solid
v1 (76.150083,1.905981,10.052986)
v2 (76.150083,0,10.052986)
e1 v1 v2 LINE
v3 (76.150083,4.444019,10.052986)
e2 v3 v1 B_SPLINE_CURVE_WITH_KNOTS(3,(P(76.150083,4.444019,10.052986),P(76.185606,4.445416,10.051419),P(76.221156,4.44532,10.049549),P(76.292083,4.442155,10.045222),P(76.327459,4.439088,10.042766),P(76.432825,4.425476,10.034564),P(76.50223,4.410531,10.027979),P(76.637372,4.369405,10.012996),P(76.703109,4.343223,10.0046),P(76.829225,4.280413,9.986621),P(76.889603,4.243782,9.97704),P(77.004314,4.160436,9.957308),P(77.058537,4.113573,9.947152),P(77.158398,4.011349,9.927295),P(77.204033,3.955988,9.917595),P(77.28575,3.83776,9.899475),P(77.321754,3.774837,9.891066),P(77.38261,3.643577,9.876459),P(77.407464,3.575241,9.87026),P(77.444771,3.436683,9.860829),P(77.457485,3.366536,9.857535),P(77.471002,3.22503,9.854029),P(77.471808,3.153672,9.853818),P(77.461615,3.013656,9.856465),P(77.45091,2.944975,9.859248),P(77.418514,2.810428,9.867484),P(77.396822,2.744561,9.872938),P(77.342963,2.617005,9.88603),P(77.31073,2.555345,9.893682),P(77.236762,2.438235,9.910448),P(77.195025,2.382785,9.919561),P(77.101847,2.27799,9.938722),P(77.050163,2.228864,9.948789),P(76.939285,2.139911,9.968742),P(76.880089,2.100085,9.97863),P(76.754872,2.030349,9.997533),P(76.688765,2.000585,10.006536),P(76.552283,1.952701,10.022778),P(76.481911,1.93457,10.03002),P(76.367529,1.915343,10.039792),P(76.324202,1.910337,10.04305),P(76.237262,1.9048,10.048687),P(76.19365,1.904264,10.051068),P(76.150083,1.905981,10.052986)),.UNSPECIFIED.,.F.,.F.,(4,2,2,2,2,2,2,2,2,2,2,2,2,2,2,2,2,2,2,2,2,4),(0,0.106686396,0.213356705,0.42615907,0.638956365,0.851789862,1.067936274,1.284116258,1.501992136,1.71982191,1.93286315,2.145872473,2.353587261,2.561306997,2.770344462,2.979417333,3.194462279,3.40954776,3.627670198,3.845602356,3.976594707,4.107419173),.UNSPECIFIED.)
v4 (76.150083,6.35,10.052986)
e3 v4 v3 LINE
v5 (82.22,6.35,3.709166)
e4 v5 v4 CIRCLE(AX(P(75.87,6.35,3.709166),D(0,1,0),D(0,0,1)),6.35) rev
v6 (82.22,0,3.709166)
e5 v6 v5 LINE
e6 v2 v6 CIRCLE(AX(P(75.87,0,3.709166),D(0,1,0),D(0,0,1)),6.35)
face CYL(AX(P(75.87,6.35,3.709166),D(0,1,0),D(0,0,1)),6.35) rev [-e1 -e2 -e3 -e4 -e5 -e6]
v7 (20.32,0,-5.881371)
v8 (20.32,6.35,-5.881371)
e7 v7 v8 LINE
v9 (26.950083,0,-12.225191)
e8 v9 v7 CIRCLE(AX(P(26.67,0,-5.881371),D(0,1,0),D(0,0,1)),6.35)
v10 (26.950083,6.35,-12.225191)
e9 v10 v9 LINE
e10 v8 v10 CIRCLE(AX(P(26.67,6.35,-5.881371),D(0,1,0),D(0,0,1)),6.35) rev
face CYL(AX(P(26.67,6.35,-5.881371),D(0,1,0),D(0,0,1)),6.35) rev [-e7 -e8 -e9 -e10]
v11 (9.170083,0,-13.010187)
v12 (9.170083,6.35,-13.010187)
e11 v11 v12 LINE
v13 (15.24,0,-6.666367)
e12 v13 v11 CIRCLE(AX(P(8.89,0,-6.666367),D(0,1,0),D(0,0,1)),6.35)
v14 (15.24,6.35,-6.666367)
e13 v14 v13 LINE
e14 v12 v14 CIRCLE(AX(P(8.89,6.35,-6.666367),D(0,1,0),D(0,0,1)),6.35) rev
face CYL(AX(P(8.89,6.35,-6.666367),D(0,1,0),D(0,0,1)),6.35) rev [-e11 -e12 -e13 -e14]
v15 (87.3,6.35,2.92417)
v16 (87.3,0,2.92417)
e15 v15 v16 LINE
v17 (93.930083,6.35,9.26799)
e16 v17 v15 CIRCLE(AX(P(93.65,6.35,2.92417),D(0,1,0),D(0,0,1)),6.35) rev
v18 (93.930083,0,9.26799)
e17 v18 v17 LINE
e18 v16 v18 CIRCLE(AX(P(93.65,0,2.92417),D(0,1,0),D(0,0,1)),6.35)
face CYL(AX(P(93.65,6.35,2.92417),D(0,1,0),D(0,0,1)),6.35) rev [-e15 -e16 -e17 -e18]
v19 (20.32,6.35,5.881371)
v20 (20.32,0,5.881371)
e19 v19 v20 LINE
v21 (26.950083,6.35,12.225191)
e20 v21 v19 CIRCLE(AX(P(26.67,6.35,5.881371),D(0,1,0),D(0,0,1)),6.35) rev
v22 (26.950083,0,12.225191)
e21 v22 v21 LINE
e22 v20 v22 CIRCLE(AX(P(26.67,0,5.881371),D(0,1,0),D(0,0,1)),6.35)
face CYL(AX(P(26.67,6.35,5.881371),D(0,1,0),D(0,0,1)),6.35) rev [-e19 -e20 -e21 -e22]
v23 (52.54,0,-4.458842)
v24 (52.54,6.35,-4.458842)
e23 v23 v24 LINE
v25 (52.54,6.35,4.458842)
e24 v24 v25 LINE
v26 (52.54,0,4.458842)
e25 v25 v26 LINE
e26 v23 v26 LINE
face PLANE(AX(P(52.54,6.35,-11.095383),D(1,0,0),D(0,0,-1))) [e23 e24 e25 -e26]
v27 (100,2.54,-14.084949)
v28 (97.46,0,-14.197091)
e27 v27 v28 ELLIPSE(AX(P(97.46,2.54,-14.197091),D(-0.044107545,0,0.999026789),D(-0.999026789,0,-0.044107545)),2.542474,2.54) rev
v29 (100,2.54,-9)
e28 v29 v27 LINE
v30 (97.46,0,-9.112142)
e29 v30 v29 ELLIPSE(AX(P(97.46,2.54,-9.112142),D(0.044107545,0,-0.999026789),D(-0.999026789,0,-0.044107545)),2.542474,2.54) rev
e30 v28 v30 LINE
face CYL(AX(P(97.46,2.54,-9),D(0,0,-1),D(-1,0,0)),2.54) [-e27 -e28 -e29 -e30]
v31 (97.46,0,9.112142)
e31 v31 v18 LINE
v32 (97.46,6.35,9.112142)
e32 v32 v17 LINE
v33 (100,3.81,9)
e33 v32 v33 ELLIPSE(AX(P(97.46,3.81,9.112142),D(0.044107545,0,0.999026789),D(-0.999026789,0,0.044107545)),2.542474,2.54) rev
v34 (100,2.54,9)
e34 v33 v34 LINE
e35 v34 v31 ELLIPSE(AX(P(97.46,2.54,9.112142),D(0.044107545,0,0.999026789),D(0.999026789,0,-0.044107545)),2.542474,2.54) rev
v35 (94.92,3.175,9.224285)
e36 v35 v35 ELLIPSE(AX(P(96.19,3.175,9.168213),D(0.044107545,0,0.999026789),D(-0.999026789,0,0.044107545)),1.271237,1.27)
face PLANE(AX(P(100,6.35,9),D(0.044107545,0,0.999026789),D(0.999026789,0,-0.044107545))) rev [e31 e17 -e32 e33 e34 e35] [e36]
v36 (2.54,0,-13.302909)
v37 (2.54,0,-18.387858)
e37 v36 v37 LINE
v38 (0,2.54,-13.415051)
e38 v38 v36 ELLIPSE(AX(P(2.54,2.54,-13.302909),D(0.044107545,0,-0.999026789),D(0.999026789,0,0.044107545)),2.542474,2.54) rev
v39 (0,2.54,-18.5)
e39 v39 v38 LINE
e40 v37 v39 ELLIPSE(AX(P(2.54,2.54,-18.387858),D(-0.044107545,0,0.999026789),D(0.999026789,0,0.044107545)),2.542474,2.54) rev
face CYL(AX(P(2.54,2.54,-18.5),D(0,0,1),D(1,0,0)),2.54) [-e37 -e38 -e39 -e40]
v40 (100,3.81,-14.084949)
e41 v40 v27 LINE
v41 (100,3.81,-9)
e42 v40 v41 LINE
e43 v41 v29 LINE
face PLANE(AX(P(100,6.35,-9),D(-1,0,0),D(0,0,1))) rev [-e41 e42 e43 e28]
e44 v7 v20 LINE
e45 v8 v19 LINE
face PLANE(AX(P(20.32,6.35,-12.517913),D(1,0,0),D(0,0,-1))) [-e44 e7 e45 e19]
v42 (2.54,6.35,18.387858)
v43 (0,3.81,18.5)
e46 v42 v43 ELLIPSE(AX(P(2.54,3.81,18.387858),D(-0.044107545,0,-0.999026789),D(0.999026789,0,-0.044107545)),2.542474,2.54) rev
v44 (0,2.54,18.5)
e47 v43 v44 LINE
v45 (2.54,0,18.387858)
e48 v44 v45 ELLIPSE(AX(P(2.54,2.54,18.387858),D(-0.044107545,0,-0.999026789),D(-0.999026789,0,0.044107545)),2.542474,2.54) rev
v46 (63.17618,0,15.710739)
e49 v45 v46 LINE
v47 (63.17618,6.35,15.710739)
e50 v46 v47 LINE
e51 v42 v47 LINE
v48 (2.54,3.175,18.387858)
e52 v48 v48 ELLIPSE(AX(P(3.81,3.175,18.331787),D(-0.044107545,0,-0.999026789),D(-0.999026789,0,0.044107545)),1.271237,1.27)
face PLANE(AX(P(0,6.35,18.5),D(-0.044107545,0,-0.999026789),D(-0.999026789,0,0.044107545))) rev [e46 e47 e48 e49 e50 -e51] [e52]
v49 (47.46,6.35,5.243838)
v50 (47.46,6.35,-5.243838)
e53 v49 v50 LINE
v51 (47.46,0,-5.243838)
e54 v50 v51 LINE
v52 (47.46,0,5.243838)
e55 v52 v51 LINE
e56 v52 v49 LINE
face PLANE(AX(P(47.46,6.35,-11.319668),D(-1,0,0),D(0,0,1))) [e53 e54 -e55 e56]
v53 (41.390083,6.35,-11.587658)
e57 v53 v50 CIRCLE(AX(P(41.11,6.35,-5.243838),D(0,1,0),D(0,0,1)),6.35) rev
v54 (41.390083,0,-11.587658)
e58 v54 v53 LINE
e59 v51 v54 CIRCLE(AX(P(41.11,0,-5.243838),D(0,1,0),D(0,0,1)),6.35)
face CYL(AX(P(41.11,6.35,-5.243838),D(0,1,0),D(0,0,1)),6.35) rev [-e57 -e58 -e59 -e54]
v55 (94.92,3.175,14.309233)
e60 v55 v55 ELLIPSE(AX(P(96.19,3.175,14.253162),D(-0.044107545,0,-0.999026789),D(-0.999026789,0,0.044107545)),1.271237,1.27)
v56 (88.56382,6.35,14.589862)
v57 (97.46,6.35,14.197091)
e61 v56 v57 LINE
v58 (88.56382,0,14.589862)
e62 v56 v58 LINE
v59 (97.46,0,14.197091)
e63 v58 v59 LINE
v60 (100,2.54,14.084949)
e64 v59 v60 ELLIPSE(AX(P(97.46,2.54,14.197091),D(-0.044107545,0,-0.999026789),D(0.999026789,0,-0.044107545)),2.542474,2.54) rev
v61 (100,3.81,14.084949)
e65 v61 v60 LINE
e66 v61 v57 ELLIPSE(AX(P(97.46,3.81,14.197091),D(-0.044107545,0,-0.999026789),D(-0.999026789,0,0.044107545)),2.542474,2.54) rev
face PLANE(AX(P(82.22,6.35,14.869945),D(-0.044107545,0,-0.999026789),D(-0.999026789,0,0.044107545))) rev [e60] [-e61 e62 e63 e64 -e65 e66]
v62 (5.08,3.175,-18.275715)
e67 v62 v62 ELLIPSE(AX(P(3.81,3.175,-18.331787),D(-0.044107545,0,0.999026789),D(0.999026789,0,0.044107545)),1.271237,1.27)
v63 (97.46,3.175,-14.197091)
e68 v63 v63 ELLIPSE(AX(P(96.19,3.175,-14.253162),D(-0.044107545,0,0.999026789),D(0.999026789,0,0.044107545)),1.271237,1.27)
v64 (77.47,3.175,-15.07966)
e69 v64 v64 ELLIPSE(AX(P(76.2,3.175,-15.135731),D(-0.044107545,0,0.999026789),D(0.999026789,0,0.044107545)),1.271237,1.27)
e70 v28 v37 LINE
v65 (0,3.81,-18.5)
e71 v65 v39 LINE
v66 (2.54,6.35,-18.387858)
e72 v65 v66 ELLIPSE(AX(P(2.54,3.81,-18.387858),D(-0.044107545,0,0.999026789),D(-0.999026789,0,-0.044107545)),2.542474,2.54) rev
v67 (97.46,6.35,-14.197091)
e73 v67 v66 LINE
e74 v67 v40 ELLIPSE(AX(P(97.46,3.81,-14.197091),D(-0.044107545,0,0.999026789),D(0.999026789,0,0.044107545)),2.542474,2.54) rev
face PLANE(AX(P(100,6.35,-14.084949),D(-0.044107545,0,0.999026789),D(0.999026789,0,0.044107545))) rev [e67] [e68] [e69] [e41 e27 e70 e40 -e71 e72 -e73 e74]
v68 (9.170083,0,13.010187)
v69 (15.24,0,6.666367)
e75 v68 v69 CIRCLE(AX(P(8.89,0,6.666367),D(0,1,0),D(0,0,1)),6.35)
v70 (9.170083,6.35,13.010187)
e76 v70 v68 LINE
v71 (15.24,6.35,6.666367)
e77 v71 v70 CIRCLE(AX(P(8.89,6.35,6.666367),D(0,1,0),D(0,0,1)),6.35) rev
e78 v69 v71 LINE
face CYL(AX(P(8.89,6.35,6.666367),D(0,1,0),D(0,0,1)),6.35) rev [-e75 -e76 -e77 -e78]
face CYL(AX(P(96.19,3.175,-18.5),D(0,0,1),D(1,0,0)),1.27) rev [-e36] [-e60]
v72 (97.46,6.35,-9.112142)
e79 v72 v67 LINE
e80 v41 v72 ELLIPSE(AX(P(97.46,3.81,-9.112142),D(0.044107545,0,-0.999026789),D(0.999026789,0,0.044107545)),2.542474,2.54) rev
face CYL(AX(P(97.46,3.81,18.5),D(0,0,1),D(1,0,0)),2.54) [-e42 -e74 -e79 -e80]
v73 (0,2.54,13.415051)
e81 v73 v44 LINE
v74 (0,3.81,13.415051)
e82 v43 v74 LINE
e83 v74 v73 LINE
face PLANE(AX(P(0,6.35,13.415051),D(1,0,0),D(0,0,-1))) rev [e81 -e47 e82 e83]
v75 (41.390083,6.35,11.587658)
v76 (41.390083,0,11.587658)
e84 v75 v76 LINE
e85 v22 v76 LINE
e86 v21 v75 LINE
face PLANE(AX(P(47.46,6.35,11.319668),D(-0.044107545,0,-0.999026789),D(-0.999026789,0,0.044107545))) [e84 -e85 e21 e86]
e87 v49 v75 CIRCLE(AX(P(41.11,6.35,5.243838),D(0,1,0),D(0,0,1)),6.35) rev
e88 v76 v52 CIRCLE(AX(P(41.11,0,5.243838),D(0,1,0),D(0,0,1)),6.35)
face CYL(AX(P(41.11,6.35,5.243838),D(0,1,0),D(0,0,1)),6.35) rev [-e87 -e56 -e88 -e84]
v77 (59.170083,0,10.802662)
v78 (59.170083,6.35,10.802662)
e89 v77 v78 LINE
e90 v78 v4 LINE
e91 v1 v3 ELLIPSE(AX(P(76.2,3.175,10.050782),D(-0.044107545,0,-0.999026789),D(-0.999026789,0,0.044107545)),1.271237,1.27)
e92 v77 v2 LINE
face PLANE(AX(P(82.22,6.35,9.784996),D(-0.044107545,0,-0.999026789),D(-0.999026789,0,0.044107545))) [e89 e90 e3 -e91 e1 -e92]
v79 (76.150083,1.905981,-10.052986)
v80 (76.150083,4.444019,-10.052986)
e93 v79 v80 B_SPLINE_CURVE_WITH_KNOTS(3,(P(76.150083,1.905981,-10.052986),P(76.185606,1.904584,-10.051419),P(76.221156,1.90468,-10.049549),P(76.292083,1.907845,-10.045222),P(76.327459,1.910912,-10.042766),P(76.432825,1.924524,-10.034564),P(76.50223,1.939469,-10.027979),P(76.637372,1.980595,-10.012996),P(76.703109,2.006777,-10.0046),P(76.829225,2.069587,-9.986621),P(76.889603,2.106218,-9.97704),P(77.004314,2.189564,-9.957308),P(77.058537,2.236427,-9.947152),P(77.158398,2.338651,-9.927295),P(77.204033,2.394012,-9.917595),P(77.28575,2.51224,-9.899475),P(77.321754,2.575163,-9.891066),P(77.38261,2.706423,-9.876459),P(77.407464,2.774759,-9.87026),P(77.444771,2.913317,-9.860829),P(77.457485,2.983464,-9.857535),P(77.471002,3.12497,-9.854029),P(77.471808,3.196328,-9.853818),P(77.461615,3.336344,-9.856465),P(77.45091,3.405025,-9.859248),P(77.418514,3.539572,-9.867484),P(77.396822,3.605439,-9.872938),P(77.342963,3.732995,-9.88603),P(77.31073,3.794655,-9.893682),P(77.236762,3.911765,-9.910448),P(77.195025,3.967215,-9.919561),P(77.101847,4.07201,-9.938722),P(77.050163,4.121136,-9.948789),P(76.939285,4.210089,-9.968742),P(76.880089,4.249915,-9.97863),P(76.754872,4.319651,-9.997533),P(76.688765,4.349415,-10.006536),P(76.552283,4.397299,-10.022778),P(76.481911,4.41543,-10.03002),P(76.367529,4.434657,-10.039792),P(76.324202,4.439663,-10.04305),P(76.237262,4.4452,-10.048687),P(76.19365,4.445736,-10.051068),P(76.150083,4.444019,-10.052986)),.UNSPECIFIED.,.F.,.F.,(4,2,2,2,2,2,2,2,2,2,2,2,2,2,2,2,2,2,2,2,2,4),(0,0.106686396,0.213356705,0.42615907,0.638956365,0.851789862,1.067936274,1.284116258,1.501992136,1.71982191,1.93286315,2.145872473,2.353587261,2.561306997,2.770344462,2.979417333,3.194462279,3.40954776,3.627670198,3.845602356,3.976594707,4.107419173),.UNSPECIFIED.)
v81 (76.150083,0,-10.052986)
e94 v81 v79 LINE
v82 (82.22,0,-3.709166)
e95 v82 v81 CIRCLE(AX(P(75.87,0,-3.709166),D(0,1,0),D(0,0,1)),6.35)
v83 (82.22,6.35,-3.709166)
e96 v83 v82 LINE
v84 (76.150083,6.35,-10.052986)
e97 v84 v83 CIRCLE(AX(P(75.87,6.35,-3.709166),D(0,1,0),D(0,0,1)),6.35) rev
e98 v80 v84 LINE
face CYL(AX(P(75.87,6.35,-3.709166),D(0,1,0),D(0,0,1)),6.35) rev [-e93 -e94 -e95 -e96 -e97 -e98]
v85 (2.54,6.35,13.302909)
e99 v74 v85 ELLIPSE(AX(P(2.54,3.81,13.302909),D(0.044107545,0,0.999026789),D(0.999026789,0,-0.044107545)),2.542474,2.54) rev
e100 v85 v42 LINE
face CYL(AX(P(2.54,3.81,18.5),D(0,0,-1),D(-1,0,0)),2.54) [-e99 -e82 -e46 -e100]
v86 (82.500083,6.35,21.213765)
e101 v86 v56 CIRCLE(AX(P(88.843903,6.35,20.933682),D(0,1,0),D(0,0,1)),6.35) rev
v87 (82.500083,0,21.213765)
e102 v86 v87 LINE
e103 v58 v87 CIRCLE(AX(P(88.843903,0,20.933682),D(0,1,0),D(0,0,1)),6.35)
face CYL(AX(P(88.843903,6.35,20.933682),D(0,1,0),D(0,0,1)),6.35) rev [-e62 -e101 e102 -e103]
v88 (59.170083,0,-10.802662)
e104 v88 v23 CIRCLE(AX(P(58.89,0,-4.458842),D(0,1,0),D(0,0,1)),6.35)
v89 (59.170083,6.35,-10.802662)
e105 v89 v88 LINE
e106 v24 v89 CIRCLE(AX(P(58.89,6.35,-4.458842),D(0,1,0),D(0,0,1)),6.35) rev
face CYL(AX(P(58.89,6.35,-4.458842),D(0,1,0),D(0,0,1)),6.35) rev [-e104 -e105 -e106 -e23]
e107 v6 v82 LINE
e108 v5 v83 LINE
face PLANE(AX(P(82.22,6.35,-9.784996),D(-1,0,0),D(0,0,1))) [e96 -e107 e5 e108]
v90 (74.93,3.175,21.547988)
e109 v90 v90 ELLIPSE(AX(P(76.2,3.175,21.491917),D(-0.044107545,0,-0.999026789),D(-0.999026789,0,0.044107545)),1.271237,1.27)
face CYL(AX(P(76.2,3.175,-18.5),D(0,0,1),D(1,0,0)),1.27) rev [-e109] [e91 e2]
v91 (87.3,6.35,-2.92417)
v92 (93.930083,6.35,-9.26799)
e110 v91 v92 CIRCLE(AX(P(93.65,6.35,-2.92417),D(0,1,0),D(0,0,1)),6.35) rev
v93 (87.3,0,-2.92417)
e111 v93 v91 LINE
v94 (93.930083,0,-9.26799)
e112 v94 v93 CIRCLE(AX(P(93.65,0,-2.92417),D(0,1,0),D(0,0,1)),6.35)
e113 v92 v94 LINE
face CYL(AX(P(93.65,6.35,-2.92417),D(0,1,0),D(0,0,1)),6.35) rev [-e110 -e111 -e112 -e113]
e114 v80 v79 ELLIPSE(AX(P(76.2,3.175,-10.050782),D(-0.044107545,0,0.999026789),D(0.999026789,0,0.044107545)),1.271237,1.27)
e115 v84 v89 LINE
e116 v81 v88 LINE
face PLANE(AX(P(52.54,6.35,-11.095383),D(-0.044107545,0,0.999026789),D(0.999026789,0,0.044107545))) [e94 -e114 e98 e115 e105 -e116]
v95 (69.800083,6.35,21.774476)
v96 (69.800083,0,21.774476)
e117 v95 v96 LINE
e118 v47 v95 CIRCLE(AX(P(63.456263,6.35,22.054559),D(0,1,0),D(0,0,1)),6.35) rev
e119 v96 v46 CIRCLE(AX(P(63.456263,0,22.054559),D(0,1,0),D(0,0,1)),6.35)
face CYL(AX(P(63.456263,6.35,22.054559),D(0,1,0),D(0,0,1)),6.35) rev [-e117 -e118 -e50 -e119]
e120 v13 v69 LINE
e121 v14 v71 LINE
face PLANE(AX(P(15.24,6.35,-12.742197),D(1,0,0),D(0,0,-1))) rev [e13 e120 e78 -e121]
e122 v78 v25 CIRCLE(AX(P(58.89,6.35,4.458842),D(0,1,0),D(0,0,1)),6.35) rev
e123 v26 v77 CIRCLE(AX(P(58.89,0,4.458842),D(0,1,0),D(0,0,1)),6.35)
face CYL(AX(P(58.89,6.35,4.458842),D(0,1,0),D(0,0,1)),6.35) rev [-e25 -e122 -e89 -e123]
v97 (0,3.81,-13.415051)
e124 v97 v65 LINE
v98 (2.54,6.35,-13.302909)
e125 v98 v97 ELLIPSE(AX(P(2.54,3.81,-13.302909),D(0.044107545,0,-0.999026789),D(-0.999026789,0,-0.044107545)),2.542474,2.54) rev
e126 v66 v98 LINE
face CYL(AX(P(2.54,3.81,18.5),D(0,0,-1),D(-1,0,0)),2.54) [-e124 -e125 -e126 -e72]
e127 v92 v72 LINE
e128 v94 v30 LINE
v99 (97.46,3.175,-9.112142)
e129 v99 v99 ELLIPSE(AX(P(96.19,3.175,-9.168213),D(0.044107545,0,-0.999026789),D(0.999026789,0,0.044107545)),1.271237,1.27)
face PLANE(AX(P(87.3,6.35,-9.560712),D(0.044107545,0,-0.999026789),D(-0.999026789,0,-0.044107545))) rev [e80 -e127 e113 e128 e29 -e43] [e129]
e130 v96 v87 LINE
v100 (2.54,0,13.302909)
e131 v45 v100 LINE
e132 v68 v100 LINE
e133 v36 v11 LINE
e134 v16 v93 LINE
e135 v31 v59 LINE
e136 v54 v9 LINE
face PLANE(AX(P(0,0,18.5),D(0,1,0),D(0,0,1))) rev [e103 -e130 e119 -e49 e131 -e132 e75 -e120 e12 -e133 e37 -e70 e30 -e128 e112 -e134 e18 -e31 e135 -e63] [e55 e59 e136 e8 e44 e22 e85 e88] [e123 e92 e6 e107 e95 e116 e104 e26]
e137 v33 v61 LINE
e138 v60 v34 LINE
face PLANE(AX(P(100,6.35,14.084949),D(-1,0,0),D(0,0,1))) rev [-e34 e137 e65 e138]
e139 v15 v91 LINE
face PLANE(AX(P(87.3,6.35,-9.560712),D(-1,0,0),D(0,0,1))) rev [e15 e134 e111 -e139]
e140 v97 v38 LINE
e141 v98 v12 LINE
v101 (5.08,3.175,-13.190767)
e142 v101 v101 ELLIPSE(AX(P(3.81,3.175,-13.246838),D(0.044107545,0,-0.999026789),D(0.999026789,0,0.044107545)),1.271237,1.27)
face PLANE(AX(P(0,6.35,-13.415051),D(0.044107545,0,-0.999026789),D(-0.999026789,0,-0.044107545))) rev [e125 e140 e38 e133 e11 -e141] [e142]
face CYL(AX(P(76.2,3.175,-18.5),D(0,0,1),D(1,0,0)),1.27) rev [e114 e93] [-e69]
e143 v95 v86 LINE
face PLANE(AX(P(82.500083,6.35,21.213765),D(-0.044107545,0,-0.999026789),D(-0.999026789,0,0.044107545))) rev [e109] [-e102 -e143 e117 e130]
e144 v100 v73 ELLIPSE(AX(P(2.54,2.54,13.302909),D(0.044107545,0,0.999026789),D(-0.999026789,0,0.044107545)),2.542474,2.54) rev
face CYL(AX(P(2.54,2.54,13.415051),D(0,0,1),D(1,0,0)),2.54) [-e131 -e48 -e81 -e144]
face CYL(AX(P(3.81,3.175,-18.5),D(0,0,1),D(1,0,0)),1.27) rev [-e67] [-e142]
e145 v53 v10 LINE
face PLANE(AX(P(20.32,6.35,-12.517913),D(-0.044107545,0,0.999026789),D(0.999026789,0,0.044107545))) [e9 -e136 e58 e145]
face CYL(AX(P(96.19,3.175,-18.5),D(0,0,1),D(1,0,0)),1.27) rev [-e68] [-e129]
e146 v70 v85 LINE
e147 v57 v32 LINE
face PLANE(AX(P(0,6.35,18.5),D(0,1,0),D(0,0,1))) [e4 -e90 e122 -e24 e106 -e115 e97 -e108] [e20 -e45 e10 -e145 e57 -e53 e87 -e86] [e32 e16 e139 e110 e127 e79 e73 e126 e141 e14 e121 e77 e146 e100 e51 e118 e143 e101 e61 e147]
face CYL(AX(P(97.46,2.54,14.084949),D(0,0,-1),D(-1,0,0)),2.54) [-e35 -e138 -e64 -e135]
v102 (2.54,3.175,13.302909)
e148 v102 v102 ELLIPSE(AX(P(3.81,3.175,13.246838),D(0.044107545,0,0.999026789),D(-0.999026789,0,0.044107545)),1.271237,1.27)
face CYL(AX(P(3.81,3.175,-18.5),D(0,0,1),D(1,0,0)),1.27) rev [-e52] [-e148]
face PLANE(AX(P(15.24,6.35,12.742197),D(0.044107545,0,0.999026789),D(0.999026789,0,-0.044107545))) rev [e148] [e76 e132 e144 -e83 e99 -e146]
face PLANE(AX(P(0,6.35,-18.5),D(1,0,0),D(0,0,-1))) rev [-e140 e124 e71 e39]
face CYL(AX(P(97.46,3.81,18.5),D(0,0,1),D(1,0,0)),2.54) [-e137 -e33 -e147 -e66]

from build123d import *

# Parameters (mm, degrees)
ARM_DEPTH               = 6.35
CUT_EXTRUDE1_DEPTH      = 103.539993784
CUT_EXTRUDE1_DEPTH_BACK = 103.539993784
SKETCH2_R               = 1.27
CUT_EXTRUDE2_DEPTH      = 103.539993784
CUT_EXTRUDE2_DEPTH_BACK = 103.539993784
SKETCH3_R               = 1.27
FILLET1_R               = 2.54
FILLET2_R               = 6.35
FILLET3_R               = 6.35


# Some blends are built 0.0001 mm under size
with BuildPart() as part:
    # Sketch1 → Arm (new body)
    with BuildSketch(Plane(origin=(0, 0, 0), x_dir=(1, 0, 0), z_dir=(0, 1, 0))):
        Polygon((0, -18.5), (69.52, -15.430656357), (69.80008291, -21.774476465), (82.50008291, -21.213764954), (82.22, -14.869944846), (100, -14.08494873), (100, -9), (87.3, -9.560711511), (87.3, 9.560711511), (100, 9), (100, 14.08494873), (0, 18.5), (0, 13.41505127), (15.24, 12.742197457), (15.24, -12.742197457), (0, -13.41505127), align=None)
        Polygon((82.22, -9.784996116), (52.54, -11.095383333), (52.54, 11.095383333), (82.22, 9.784996116), align=None, mode=Mode.SUBTRACT)
        Polygon((20.32, 12.517912852), (20.32, -12.517912852), (47.46, -11.319667937), (47.46, 11.319667937), align=None, mode=Mode.SUBTRACT)
    extrude(amount=ARM_DEPTH)

    # Sketch2 → Cut-Extrude1 (cut, two sides: drawn at the far end of the back side and taken through both)
    with BuildSketch(Plane.XY.offset(-CUT_EXTRUDE1_DEPTH_BACK)):
        with Locations(Location((76.2, 3.175, 0), (0, 0, 180))):
            Circle(SKETCH2_R)
    extrude(amount=CUT_EXTRUDE1_DEPTH + CUT_EXTRUDE1_DEPTH_BACK, mode=Mode.SUBTRACT)

    # Sketch3 → Cut-Extrude2 (cut, two sides: drawn at the far end of the back side and taken through both)
    with BuildSketch(Plane.XY.offset(-CUT_EXTRUDE2_DEPTH_BACK)):
        with Locations((96.19, 3.175)):
            Circle(SKETCH3_R)
        with Locations(Location((3.81, 3.175, 0), (0, 0, 180))):
            Circle(SKETCH3_R)
    extrude(amount=CUT_EXTRUDE2_DEPTH + CUT_EXTRUDE2_DEPTH_BACK, mode=Mode.SUBTRACT)

    # Fillet1
    fillet1_edges = [part.edges().sort_by_distance(p)[0] for p in [
        (0, 0, -15.957525635),
        (100, 0, -11.542474365),
        (100, 0, 11.542474365),
        (0, 0, 15.957525635),
        (100, 6.35, 11.542474365),
        (100, 6.35, -11.542474365),
        (0, 6.35, 15.957525635),
        (0, 6.35, -15.957525635),
    ]]
    fillet(fillet1_edges, radius=FILLET1_R)

    # Fillet2
    # the kernel refuses this fillet: 6.35 mm, written as the material it adds along each edge
    with BuildSketch(Plane(origin=(15.24, 0, 12.742197457), x_dir=(-0.999026788670257, 0, 0.04410754492367402), z_dir=(0, 1, 0)), Plane(origin=(15.24, 0, -12.742197457), x_dir=(0, 0, 1), z_dir=(0, 1, 0))) as fillet2_piece_1:
        with BuildLine():
            CenterArc((FILLET2_R * 0.95682364669, -FILLET2_R), FILLET2_R, 90, 87.472003686)
            Line((-FILLET2_R * 0.0422031419804, -FILLET2_R * 0.955892455076), (0, 0))
            Line((0, 0), (FILLET2_R * 0.95682364669, 0))
        make_face()
    extrude(amount=6.35)
    with BuildSketch(Plane(origin=(87.3, 0, 9.560711511), x_dir=(0.9990267886702568, 0, -0.04410754492367471), z_dir=(0, 1, 0)), Plane(origin=(52.54, 0, 11.095383333), x_dir=(0.9990267886702568, 0, -0.044107544923674566), z_dir=(0, 1, 0)), Plane(origin=(20.32, 0, 12.517912852), x_dir=(0.9990267886702568, 0, -0.044107544923674614), z_dir=(0, 1, 0)), Plane(origin=(87.3, 0, -9.560711511), x_dir=(0, 0, 1), z_dir=(0, 1, 0)), Plane(origin=(52.54, 0, -11.095383333), x_dir=(0, 0, 1), z_dir=(0, 1, 0))) as fillet2_piece_2:
        with BuildLine():
            CenterArc((FILLET2_R * 1.0451246721, FILLET2_R), FILLET2_R, 177.472003686, 92.527996314)
            Line((FILLET2_R * 0.0460978834253, FILLET2_R * 1.04410754492), (0, 0))
            Line((0, 0), (FILLET2_R * 1.0451246721, 0))
        make_face()
    extrude(amount=6.35)
    with BuildSketch(Plane(origin=(47.46, 0, 11.319667937), x_dir=(0, 0, -1), z_dir=(0, 1, 0)), Plane(origin=(47.46, 0, -11.319667937), x_dir=(-0.9990267886702568, 0, -0.04410754492367462), z_dir=(0, 1, 0))) as fillet2_piece_3:
        with BuildLine():
            CenterArc((FILLET2_R * 0.95682364669, FILLET2_R), FILLET2_R, 182.527996314, 87.472003686)
            Line((-FILLET2_R * 0.0422031419804, FILLET2_R * 0.955892455076), (0, 0))
            Line((0, 0), (FILLET2_R * 0.95682364669, 0))
        make_face()
    extrude(amount=6.35)
    with BuildSketch(Plane(origin=(20.32, 0, -12.517912852), x_dir=(0.9990267886702568, 0, 0.044107544923674594), z_dir=(0, 1, 0))) as fillet2_piece_4:
        with BuildLine():
            CenterArc((FILLET2_R * 1.0451246721, -FILLET2_R), FILLET2_R, 90, 92.527996314)
            Line((FILLET2_R * 0.0460978834253, -FILLET2_R * 1.04410754492), (0, 0))
            Line((0, 0), (FILLET2_R * 1.0451246721, 0))
        make_face()
    extrude(amount=6.35)
    with BuildSketch(Plane(origin=(82.22, 0, 9.784996116), x_dir=(-0.9990267886702568, 0, 0.04410754492367457), z_dir=(0, 1, 0))) as fillet2_piece_5_section:
        with BuildLine():
            CenterArc((FILLET2_R * 0.95682364669, -FILLET2_R), FILLET2_R, 90, 87.472003686)
            Line((-FILLET2_R * 0.0422031419804, -FILLET2_R * 0.955892455076), (0, 0))
            Line((0, 0), (FILLET2_R * 0.95682364669, 0))
        make_face()
    fillet2_piece_5 = extrude(amount=6.35, mode=Mode.PRIVATE)
    fillet2_piece_5 = fillet2_piece_5 - Plane(origin=(76.2, 3.175, 9.784996116), x_dir=(-1, 0, 0), z_dir=(0, 0, -1)) * Cylinder(1.27, 38, mode=Mode.PRIVATE)
    add(fillet2_piece_5)
    with BuildSketch(Plane(origin=(82.22, 0, -9.784996116), x_dir=(-0.9990267886702568, 0, -0.04410754492367478), z_dir=(0, 1, 0))) as fillet2_piece_6_section:
        with BuildLine():
            CenterArc((FILLET2_R * 0.95682364669, FILLET2_R), FILLET2_R, 182.527996314, 87.472003686)
            Line((-FILLET2_R * 0.0422031419804, FILLET2_R * 0.955892455076), (0, 0))
            Line((0, 0), (FILLET2_R * 0.95682364669, 0))
        make_face()
    fillet2_piece_6 = extrude(amount=6.35, mode=Mode.PRIVATE)
    fillet2_piece_6 = fillet2_piece_6 - Plane(origin=(76.2, 3.175, -9.784996116), x_dir=(-1, 0, 0), z_dir=(0, 0, 1)) * Cylinder(1.27, 38, mode=Mode.PRIVATE)
    add(fillet2_piece_6)

    # Fillet3
    fillet3_edges = [part.edges().sort_by_distance(p)[0] for p in [
        (69.52, 3.175, 15.430656357),
        (82.22, 3.175, 14.869944846),
    ]]
    fillet(fillet3_edges, radius=FILLET3_R - 0.0001)  # a hair under: the kernel refuses the full size


solid = part.part
